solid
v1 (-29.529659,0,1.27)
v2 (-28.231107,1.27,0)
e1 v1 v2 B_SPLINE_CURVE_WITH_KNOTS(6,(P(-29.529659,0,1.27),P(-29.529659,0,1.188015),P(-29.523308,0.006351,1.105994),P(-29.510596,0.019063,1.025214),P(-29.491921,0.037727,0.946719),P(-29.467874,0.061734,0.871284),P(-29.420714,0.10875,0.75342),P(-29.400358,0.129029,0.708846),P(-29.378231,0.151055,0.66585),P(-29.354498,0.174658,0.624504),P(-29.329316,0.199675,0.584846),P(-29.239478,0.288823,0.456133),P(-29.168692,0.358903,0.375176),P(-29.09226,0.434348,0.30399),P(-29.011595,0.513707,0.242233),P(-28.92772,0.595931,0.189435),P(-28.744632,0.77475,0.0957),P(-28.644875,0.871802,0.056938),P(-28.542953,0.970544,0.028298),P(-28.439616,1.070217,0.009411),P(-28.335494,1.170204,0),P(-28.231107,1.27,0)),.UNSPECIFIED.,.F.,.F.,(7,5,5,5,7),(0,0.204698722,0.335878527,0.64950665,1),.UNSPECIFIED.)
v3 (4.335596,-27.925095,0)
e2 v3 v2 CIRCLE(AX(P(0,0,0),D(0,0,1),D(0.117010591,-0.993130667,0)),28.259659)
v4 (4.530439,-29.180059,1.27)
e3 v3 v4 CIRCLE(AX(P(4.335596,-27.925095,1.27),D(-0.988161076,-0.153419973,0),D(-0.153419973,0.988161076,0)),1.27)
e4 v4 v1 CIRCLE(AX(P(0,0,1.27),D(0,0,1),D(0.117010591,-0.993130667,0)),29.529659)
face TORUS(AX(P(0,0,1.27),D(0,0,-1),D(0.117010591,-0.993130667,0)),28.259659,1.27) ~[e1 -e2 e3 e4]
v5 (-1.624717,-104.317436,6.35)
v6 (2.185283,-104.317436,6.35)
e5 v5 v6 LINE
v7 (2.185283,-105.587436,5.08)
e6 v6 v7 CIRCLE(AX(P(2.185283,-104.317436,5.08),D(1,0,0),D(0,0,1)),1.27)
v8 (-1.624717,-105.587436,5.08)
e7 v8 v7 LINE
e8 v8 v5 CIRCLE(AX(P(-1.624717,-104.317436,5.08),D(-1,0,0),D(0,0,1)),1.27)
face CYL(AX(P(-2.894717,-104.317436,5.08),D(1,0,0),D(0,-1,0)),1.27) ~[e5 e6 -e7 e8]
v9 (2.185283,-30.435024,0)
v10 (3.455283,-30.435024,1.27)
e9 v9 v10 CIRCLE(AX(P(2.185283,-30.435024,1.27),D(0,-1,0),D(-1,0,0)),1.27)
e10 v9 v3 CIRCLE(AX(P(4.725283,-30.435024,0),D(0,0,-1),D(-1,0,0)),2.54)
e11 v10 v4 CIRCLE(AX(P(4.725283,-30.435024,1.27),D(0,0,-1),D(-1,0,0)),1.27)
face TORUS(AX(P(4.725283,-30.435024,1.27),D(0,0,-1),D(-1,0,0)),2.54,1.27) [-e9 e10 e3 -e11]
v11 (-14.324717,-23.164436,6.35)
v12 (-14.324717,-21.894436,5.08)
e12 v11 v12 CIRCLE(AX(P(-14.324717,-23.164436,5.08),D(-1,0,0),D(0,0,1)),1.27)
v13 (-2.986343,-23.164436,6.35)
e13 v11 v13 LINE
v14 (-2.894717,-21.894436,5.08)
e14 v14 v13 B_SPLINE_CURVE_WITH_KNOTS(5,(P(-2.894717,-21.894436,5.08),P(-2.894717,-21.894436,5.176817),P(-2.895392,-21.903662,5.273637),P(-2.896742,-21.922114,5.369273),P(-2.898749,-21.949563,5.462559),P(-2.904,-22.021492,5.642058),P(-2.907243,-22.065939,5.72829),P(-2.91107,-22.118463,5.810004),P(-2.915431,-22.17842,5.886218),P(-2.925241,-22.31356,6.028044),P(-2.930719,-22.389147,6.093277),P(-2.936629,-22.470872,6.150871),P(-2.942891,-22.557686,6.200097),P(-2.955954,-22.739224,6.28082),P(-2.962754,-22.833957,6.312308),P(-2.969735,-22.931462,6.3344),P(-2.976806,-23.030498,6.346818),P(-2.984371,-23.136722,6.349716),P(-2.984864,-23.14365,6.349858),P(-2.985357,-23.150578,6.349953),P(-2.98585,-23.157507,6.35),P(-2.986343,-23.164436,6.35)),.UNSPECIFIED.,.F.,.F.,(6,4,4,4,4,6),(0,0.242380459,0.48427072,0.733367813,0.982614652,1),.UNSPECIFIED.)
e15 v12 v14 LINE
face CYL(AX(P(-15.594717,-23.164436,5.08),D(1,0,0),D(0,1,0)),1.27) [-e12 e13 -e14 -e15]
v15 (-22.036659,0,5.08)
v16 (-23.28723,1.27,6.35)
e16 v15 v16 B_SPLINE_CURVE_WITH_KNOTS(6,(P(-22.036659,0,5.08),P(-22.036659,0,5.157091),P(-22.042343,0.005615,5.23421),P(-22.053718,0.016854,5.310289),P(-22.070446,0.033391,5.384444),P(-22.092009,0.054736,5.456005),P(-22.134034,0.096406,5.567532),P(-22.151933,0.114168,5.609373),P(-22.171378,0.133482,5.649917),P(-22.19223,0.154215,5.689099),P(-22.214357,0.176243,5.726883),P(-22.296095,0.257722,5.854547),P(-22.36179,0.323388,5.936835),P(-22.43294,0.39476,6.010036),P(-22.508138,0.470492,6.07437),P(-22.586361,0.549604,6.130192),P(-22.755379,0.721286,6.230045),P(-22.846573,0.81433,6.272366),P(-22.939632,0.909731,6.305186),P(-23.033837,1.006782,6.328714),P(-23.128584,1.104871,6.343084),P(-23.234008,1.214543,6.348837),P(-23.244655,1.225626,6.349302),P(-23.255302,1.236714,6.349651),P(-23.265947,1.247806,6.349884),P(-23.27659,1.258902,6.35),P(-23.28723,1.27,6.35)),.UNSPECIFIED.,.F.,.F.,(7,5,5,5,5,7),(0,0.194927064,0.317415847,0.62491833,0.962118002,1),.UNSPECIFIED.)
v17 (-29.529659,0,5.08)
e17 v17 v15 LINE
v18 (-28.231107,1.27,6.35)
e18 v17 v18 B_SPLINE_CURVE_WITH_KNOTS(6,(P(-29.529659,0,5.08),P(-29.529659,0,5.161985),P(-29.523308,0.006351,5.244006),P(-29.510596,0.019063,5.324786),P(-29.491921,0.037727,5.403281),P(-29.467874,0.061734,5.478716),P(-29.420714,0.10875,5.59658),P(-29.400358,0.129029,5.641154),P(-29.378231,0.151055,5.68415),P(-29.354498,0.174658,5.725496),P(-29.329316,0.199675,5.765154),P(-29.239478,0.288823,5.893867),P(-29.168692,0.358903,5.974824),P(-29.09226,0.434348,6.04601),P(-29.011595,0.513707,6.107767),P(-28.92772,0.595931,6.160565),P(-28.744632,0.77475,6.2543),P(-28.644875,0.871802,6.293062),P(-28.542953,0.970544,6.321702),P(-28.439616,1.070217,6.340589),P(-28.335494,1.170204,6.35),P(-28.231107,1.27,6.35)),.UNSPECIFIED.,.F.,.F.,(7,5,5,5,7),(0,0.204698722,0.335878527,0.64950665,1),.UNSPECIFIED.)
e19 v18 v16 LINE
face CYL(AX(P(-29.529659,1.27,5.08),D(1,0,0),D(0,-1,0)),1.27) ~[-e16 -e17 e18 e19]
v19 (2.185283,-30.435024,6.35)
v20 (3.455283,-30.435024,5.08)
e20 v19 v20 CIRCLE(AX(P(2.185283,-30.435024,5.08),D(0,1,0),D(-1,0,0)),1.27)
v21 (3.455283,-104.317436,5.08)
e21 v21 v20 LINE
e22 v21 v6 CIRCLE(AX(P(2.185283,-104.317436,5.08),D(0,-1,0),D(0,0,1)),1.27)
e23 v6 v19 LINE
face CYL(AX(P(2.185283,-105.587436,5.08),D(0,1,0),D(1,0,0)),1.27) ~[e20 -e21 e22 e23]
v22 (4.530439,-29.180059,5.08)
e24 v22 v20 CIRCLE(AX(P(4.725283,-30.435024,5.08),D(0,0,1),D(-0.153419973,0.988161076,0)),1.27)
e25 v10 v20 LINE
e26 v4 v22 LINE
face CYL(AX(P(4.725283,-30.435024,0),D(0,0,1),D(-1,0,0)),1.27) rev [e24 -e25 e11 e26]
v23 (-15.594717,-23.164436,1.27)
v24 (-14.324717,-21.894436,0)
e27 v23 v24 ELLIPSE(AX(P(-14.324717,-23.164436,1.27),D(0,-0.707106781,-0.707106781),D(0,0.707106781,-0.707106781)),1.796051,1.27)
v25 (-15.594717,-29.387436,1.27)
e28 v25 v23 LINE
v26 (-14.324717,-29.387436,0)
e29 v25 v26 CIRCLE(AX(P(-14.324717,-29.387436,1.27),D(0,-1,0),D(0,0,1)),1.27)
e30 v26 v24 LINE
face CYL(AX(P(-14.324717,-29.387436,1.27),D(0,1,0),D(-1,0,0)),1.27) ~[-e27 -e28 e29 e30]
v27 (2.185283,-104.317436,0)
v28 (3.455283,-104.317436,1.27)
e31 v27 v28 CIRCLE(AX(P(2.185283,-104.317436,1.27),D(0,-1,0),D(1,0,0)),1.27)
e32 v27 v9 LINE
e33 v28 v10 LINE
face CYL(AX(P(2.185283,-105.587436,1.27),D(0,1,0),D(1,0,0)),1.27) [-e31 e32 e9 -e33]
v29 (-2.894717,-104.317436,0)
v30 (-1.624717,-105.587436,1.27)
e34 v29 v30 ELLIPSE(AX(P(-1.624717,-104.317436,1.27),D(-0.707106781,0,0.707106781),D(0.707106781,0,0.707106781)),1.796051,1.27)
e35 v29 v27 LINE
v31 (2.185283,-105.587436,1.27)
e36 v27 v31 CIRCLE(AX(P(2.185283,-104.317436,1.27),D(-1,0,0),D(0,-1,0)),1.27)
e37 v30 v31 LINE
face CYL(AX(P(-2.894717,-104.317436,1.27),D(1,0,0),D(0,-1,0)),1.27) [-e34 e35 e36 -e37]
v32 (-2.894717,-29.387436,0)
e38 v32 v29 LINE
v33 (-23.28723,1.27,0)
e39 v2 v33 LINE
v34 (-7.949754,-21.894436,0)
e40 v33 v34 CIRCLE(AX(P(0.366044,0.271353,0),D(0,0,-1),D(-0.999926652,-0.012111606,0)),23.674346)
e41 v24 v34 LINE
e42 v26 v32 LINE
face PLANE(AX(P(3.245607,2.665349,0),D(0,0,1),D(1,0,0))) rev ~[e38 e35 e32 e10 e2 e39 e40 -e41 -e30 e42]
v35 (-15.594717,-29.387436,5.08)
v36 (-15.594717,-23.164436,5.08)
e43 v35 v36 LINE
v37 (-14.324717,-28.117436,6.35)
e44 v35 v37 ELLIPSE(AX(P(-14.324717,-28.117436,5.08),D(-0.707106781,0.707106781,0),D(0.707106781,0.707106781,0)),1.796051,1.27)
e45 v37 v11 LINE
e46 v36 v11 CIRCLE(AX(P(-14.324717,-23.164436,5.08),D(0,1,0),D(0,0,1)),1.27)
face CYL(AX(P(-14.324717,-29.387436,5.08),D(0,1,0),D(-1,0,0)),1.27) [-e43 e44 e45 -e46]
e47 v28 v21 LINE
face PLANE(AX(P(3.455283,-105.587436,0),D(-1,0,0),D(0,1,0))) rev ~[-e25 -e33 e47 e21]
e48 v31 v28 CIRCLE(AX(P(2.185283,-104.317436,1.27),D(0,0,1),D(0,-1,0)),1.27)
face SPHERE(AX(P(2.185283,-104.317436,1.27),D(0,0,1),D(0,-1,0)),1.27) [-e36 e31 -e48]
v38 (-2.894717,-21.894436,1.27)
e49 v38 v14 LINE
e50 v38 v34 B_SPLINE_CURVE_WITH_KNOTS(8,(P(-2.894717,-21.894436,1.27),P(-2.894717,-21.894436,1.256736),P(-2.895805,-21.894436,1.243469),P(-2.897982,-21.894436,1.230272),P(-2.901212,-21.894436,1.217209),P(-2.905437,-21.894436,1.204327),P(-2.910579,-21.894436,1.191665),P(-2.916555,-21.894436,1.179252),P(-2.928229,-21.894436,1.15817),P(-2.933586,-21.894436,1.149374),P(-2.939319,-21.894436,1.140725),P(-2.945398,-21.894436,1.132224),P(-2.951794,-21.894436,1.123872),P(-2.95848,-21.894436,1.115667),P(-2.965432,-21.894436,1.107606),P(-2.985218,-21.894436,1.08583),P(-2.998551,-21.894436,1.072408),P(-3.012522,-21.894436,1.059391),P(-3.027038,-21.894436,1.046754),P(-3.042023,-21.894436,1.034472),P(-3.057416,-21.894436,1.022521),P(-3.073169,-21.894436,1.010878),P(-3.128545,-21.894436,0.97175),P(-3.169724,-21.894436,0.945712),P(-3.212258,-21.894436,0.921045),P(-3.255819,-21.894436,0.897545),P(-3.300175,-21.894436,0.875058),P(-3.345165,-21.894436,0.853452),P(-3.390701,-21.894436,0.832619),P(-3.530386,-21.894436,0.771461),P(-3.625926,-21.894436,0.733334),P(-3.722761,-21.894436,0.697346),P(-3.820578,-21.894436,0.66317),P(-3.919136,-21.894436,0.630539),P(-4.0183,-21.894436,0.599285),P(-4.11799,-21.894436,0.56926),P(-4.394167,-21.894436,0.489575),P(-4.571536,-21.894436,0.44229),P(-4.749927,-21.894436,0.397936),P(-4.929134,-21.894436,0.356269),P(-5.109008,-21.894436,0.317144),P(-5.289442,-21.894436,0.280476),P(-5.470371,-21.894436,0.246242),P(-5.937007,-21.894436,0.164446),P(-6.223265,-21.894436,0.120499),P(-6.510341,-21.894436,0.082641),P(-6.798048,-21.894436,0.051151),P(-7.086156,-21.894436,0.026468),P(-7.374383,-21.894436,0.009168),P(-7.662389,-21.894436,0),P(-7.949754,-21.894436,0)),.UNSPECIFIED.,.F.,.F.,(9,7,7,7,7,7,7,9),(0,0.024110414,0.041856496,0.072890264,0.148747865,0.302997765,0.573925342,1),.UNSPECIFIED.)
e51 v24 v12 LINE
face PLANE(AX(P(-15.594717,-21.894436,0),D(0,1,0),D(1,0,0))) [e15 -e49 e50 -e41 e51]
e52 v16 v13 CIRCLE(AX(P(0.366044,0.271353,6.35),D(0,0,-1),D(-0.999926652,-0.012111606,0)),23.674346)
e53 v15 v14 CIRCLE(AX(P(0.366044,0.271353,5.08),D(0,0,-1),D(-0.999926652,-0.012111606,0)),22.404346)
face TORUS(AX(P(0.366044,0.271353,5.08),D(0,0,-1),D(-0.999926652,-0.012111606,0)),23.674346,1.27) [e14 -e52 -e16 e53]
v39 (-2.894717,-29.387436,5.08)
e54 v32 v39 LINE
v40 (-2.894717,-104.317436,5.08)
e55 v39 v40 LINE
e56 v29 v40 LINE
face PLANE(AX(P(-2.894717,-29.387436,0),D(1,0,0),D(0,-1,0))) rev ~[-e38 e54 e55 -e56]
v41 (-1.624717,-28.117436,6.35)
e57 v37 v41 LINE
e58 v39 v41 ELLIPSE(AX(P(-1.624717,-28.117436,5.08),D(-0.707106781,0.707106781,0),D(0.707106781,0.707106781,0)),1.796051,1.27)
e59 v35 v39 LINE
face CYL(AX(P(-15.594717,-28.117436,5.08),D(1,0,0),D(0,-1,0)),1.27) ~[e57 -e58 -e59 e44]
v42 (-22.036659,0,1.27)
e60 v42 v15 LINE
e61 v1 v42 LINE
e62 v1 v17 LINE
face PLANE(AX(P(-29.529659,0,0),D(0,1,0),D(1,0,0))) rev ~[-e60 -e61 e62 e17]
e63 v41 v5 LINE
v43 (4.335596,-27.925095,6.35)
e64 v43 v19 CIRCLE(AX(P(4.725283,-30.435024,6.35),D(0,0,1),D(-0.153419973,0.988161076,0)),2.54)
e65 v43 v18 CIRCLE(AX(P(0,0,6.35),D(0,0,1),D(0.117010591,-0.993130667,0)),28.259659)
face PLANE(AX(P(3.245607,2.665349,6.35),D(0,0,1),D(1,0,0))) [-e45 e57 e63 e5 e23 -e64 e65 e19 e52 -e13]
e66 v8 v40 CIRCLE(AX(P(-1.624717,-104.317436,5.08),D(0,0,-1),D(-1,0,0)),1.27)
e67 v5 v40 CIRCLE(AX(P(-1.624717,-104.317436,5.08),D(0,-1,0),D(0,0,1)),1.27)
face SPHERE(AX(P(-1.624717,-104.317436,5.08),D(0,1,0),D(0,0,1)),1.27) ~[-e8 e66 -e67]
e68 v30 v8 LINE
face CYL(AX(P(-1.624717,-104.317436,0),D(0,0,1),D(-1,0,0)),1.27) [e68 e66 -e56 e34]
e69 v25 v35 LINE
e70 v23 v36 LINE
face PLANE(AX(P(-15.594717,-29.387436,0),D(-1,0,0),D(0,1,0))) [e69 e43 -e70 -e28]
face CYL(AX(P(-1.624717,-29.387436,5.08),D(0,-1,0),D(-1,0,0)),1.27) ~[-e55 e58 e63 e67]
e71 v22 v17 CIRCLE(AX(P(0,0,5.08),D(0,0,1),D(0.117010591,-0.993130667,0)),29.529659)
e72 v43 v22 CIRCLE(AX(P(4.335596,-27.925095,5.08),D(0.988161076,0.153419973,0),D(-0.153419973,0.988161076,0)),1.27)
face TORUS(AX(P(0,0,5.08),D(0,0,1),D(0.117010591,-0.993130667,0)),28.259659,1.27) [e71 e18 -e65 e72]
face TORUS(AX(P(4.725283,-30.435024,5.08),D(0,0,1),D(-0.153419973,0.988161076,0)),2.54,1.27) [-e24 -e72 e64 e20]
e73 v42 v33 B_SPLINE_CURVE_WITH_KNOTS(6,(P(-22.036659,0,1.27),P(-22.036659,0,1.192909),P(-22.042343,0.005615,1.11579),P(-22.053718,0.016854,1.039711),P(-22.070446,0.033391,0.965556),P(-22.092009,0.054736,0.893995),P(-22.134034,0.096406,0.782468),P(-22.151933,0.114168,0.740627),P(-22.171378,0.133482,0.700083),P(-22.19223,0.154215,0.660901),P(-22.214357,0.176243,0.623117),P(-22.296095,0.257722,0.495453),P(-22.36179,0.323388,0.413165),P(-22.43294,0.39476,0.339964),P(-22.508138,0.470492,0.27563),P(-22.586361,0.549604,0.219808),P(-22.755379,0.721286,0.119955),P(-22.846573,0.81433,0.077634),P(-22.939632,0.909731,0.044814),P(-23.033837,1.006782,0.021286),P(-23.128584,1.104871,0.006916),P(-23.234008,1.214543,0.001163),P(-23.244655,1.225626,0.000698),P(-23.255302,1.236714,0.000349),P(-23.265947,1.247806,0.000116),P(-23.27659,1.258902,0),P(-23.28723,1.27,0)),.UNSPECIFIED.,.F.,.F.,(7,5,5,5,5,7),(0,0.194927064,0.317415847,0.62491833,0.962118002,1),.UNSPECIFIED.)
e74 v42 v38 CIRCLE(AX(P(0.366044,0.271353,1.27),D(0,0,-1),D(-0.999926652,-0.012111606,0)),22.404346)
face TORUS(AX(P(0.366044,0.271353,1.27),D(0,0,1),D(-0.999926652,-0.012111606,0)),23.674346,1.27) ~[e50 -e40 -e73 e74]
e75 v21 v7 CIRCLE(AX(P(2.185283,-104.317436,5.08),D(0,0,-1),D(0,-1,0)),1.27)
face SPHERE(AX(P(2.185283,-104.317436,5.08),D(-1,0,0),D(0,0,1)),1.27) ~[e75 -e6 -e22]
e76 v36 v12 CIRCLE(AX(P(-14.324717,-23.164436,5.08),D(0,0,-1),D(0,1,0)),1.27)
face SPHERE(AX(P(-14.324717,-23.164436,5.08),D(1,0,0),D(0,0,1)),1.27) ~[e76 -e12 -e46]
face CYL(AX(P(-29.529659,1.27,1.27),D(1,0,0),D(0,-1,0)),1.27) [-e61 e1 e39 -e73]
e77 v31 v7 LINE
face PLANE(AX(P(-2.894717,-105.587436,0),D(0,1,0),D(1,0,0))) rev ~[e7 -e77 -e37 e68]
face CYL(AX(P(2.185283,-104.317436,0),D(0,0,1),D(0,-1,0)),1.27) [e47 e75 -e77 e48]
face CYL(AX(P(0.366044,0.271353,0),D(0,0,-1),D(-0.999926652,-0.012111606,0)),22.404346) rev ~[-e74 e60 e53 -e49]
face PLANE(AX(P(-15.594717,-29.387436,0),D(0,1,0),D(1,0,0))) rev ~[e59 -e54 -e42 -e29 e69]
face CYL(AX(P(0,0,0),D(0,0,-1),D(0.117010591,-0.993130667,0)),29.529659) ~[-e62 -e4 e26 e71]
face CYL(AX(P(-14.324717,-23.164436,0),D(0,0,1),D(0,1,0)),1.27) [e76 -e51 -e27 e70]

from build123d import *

# Parameters (mm, degrees)
F0_W     = 12.7
F0_H     = 7.493
F1_DEPTH = 6.35
F2_R     = 1.27


# Not quite as in the source:
# - two fillets or chamfers of one size are made in one step
# - a feature names something its author has since deleted; it is built from what else it names


with BuildPart() as f1:
    # F0 (on Top) → F1 (new body)
    with BuildSketch(Plane.XY):
        with BuildLine():
            Line((-2.8947171572, -21.8944355268), (-2.8947171572, -29.3874355268))
            ThreePointArc((-2.8947171572, -29.3874355268), (0.2819172587, -29.5283131405), (3.4552828428, -29.3268098289))
            ThreePointArc((3.4552828428, -29.3268098289), (19.6210018926, 22.0684625426), (-29.5296588918, 0))
            Line((-29.5296588918, 0), (-22.0366588918, 0))
            ThreePointArc((-22.0366588918, 0), (17.2330212266, 15.017871009), (-2.8947171572, -21.8944355268))
        make_face()
        with BuildLine():
            ThreePointArc((3.4552828428, -29.3268098289), (0.2819172587, -29.5283131405), (-2.8947171572, -29.3874355268))
            Line((-2.8947171572, -29.3874355268), (-2.8947171572, -105.5874355268))
            Line((-2.8947171572, -105.5874355268), (3.4552828428, -105.5874355268))
            Line((3.4552828428, -105.5874355268), (3.4552828428, -29.3268098289))
        make_face()
        with Locations((-9.2447171572, -25.6409355268)):
            Rectangle(F0_W, F0_H)
    extrude(amount=F1_DEPTH)

    # F2
    f2_edges = [f1.edges().sort_by_distance(p)[0] for p in [
        (19.621002, 22.068463, 6.35),
        (-25.783159, 0, 6.35),
        (17.233021, 15.017871, 6.35),
        (-9.244717, -21.894436, 6.35),
        (-15.594717, -25.640936, 6.35),
        (-9.244717, -29.387436, 6.35),
        (-2.894717, -67.487436, 6.35),
        (0.280283, -105.587436, 6.35),
        (3.455283, -67.457123, 6.35),
        (-15.594717, -25.640936, 0),
        (-15.594717, -21.894436, 3.175),
        (-25.783159, 0, 0),
        (17.233021, 15.017871, 0),
        (-2.894717, -105.587436, 3.175),
        (3.455283, -105.587436, 3.175),
        (0.280283, -105.587436, 0),
        (3.455283, -29.32681, 3.175),
        (3.455283, -67.457123, 0),
        (19.621002, 22.068463, 0),
    ]]
    fillet(f2_edges, radius=F2_R)


solid = f1.part
